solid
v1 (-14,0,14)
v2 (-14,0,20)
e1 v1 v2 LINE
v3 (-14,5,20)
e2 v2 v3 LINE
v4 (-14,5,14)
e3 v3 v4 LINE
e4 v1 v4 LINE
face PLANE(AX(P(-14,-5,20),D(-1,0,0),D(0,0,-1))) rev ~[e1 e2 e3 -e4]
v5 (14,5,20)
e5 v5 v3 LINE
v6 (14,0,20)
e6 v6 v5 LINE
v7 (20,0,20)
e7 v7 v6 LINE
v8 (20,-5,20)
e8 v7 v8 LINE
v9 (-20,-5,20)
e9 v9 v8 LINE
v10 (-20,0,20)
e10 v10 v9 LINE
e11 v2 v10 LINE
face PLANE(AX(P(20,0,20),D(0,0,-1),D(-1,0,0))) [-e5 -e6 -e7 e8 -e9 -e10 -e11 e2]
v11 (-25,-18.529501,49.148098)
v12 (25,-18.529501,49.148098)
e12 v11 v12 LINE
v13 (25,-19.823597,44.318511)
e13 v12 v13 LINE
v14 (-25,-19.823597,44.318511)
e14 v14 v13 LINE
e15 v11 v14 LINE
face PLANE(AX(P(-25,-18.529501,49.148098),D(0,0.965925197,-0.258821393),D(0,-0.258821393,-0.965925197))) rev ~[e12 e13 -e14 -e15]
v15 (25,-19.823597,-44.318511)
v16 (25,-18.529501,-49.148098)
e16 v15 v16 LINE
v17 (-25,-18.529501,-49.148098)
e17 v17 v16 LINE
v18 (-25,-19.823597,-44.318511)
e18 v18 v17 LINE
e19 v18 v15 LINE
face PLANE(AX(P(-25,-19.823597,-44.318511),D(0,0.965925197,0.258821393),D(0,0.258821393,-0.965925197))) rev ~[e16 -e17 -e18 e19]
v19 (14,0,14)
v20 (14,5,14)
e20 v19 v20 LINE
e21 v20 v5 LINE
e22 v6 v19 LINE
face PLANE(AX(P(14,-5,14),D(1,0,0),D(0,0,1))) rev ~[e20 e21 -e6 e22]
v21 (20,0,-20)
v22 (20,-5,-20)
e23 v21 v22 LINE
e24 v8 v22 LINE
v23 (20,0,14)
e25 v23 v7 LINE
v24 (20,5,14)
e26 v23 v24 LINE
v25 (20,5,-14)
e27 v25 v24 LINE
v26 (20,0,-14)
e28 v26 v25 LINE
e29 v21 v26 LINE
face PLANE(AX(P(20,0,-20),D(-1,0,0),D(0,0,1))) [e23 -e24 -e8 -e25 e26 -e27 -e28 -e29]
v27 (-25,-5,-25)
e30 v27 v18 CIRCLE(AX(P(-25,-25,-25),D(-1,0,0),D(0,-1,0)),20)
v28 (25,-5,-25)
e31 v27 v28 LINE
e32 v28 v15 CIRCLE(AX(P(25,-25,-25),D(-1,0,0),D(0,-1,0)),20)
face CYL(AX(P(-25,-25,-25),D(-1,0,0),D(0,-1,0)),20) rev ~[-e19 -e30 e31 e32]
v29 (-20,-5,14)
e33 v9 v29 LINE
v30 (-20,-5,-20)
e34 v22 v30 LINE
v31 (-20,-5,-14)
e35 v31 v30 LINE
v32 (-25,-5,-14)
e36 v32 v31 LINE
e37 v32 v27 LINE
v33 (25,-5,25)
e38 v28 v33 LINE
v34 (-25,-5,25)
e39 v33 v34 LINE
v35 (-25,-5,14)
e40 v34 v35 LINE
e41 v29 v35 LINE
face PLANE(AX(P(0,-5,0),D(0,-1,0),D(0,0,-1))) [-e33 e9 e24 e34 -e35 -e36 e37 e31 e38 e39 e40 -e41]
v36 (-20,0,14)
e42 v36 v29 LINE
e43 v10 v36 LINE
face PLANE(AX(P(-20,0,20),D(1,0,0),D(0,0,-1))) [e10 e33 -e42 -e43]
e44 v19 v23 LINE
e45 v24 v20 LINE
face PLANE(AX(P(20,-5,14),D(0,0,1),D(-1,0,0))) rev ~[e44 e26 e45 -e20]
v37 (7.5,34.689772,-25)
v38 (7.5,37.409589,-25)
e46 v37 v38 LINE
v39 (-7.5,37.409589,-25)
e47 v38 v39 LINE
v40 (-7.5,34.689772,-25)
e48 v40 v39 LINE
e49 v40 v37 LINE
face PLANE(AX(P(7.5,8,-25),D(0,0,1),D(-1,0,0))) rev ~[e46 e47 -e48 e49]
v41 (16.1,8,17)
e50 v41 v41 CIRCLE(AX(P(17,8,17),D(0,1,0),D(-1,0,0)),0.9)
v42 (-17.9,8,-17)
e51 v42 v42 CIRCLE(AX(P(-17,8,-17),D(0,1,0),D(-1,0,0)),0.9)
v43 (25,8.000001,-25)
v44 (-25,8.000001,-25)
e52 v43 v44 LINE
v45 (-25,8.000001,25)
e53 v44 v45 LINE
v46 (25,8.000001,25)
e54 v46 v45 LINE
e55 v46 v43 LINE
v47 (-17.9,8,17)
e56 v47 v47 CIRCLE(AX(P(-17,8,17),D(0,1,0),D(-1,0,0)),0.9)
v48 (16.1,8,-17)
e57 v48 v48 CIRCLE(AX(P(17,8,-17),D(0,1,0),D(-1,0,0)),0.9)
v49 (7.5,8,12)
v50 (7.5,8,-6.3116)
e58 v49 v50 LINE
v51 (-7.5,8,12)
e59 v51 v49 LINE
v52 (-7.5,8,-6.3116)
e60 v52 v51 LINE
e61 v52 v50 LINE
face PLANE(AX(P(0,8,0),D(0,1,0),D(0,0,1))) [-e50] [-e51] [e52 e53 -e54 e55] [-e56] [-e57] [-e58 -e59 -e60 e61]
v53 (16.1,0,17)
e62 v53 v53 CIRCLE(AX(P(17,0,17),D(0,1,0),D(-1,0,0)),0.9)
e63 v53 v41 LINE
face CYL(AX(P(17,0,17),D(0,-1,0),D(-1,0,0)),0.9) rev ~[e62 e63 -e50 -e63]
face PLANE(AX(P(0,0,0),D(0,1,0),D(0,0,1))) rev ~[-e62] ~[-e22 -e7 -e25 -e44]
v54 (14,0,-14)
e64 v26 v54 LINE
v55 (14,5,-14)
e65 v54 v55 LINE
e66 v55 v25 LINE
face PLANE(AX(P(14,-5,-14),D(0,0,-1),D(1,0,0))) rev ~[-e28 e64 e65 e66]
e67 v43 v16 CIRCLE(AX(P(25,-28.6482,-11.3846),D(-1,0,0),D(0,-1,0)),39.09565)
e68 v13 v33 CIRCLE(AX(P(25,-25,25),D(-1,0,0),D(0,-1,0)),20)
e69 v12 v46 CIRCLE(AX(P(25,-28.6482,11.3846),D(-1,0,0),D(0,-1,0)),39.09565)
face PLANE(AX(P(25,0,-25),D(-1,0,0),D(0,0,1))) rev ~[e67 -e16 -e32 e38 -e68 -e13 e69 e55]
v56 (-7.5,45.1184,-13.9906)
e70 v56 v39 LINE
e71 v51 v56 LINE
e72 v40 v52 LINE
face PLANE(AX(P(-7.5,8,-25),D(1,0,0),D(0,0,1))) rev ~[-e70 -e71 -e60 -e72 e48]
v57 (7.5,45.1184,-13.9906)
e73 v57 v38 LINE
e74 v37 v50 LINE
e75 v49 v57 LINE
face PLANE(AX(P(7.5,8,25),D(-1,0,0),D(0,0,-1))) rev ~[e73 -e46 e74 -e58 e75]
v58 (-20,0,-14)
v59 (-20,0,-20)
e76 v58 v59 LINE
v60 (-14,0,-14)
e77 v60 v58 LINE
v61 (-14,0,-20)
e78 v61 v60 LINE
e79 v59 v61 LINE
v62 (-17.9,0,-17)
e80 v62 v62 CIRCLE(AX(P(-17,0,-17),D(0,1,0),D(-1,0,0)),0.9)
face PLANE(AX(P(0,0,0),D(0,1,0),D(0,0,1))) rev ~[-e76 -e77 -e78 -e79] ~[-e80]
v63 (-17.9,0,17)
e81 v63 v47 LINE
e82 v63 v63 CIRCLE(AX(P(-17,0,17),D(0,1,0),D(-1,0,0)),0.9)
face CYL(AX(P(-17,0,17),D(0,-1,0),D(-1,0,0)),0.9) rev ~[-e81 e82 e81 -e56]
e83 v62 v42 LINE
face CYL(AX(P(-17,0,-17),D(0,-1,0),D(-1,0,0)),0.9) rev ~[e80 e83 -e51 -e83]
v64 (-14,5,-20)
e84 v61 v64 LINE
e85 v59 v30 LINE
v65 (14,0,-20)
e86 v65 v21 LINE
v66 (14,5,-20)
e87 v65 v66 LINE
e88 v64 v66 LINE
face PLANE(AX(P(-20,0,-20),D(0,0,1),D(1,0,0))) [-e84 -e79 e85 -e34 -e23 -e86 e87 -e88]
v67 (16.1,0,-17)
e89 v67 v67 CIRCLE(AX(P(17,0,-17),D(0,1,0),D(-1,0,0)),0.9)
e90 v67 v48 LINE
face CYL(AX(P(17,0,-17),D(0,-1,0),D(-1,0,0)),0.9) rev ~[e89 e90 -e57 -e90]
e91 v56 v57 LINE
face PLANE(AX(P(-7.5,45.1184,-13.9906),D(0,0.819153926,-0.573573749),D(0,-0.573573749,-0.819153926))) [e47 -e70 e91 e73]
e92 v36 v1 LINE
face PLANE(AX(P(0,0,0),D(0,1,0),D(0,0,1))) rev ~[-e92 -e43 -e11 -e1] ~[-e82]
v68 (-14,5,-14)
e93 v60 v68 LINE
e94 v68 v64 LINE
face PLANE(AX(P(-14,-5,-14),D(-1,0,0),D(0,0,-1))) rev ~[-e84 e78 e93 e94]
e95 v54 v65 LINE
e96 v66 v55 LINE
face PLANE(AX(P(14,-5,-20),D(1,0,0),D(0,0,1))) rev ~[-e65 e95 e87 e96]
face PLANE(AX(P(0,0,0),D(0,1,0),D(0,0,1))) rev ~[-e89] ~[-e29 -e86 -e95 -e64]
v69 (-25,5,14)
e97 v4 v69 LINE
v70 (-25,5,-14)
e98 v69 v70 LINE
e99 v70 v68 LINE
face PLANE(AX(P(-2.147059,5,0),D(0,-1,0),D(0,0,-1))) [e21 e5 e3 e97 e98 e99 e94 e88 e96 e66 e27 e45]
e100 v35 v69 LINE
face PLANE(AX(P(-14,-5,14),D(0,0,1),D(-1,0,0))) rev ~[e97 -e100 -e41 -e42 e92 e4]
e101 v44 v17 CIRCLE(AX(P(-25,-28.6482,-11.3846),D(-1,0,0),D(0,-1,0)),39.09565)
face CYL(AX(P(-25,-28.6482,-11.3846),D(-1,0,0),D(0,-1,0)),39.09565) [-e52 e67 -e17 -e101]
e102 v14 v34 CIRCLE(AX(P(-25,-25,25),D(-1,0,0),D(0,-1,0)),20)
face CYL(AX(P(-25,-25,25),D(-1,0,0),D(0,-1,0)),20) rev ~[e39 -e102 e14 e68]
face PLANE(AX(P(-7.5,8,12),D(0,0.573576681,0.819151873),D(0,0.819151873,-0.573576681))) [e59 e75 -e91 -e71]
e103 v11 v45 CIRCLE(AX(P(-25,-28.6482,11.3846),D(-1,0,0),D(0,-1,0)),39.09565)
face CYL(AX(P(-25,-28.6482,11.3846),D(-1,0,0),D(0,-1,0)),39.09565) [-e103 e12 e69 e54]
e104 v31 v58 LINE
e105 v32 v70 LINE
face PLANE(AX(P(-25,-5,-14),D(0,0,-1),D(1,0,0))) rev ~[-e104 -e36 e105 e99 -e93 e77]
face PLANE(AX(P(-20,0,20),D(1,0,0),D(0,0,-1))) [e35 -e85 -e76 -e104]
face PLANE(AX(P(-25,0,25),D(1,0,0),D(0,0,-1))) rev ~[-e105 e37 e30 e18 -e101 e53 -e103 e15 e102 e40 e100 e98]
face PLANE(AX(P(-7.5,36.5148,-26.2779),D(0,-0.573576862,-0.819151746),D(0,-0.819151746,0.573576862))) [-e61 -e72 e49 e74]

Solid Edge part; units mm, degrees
sketch "Sketch1" plane through (0, 0, 0) normal (0, -1, 0) x (1, 0, 0)
  line L0 (-20, -20) -> (20, -20)
  line L1 (20, -20) -> (20, 20)
  line L2 (20, 20) -> (-20, 20)
  line L3 (-20, 20) -> (-20, -20)
  line L4 (-25, -25) -> (25, -25)
  line L5 (25, -25) -> (25, 25)
  line L6 (25, 25) -> (-25, 25)
  line L7 (-25, 25) -> (-25, -25)
  dimension "D1" = 40
  dimension "D2" = 50
extrude "Protrusion1" add sketch "Sketch1" along normal blind 5
sketch "Sketch2" plane through (0, 0, 0) normal (0, 1, 0) x (-1, 0, 0)
  line L0 (-25, -25) -> (25, -25)
  line L1 (25, -25) -> (25, 25)
  line L2 (25, 25) -> (-25, 25)
  line L3 (-25, 25) -> (-25, -25)
  circle A0 centre (17, 17) radius 0.9
  circle A1 centre (-17, 17) radius 0.9
  circle A2 centre (-17, -17) radius 0.9
  circle A3 centre (17, -17) radius 0.9
extrude "Extrusionsausprägung_2" add sketch "Sketch2" along normal blind 8
sketch "Sketch3" plane through (-25, 1.5, 0) normal (-1, 0, 0) x (0, -1, 0)
  line L0 (6.5, 25) -> (-6.5, 25)
  arc A0 (20.0295, 49.1481) -> (-6.5, 25) centre (30.1482, 11.3846) ccw
  line L1 (20.0295, 49.1481) -> (21.3236, 44.3185)
  arc A1 (21.3236, 44.3185) -> (6.5, 25) centre (26.5, 25) ccw
  line L2 (6.5, -25) -> (-6.5, -25)
  arc A2 (-6.5, -25) -> (20.0295, -49.1481) centre (30.1482, -11.3846) ccw
  line L3 (21.3236, -44.3185) -> (20.0295, -49.1481)
  arc A3 (6.5, -25) -> (21.3236, -44.3185) centre (26.5, -25) ccw
  dimension "D1" = 5
  dimension "D2" = 5
  dimension "D3" = 20
  dimension "D4" = 20
extrude "Protrusion2" add sketch "Sketch3" against normal up to vertex (50 mm away)
sketch "Sketch4" plane through (0, -5, 0) normal (0, -1, 0) x (1, 0, 0)
  line L0 (-25, 14) -> (-25, -14)
  line L1 (-25, -14) -> (-14, -14)
  line L2 (-14, -14) -> (-14, -20)
  line L3 (-14, -20) -> (14, -20)
  line L4 (14, -20) -> (14, -14)
  line L5 (14, -14) -> (20, -14)
  line L6 (20, -14) -> (20, 14)
  line L7 (20, 14) -> (14, 14)
  line L8 (14, 14) -> (14, 20)
  line L9 (14, 20) -> (-14, 20)
  line L10 (-14, 20) -> (-14, 14)
  line L11 (-14, 14) -> (-25, 14)
  dimension "D1" = 6
extrude "Extrusionsausschnitt_1" cut sketch "Sketch4" against normal blind 10
sketch "Sketch5" plane through (0, 8, 0) normal (0, 1, 0) x (-1, 0, 0)
  line L0 (-7.5, -25) -> (7.5, -25)
  line L1 (7.5, -25) -> (7.5, 25)
  line L2 (7.5, 25) -> (-7.5, 25)
  line L3 (-7.5, 25) -> (-7.5, -25)
  dimension "D1" = 15
extrude "Extrusionsausprägung_6" add sketch "Sketch5" along normal blind 40
sketch "Sketch6" plane through (-7.5, 28, 0) normal (-1, 0, 0) x (0, -1, 0)
  line L0 (20, -6.3116) -> (20, -25)
  line L1 (-8.5148, -26.2779) -> (20, -6.3116)
  line L2 (-17.1184, -13.9906) -> (-8.5148, -26.2779)
  line L3 (20, 12) -> (-17.1184, -13.9906)
  line L4 (20, 25) -> (20, 12)
  line L5 (-20, 25) -> (20, 25)
  line L6 (-20, 25) -> (-40.7628, -3.883)
  line L7 (-40.7628, -3.883) -> (-20, -25)
  line L8 (-20, -25) -> (-14.3498, -34.4374)
  line L9 (-14.3498, -34.4374) -> (20, -25)
  dimension "D1" = 15
  dimension "D2" = 13
extrude "Cutout1" cut sketch "Sketch6" against normal through all
properties material "Nylon, allgemein"
